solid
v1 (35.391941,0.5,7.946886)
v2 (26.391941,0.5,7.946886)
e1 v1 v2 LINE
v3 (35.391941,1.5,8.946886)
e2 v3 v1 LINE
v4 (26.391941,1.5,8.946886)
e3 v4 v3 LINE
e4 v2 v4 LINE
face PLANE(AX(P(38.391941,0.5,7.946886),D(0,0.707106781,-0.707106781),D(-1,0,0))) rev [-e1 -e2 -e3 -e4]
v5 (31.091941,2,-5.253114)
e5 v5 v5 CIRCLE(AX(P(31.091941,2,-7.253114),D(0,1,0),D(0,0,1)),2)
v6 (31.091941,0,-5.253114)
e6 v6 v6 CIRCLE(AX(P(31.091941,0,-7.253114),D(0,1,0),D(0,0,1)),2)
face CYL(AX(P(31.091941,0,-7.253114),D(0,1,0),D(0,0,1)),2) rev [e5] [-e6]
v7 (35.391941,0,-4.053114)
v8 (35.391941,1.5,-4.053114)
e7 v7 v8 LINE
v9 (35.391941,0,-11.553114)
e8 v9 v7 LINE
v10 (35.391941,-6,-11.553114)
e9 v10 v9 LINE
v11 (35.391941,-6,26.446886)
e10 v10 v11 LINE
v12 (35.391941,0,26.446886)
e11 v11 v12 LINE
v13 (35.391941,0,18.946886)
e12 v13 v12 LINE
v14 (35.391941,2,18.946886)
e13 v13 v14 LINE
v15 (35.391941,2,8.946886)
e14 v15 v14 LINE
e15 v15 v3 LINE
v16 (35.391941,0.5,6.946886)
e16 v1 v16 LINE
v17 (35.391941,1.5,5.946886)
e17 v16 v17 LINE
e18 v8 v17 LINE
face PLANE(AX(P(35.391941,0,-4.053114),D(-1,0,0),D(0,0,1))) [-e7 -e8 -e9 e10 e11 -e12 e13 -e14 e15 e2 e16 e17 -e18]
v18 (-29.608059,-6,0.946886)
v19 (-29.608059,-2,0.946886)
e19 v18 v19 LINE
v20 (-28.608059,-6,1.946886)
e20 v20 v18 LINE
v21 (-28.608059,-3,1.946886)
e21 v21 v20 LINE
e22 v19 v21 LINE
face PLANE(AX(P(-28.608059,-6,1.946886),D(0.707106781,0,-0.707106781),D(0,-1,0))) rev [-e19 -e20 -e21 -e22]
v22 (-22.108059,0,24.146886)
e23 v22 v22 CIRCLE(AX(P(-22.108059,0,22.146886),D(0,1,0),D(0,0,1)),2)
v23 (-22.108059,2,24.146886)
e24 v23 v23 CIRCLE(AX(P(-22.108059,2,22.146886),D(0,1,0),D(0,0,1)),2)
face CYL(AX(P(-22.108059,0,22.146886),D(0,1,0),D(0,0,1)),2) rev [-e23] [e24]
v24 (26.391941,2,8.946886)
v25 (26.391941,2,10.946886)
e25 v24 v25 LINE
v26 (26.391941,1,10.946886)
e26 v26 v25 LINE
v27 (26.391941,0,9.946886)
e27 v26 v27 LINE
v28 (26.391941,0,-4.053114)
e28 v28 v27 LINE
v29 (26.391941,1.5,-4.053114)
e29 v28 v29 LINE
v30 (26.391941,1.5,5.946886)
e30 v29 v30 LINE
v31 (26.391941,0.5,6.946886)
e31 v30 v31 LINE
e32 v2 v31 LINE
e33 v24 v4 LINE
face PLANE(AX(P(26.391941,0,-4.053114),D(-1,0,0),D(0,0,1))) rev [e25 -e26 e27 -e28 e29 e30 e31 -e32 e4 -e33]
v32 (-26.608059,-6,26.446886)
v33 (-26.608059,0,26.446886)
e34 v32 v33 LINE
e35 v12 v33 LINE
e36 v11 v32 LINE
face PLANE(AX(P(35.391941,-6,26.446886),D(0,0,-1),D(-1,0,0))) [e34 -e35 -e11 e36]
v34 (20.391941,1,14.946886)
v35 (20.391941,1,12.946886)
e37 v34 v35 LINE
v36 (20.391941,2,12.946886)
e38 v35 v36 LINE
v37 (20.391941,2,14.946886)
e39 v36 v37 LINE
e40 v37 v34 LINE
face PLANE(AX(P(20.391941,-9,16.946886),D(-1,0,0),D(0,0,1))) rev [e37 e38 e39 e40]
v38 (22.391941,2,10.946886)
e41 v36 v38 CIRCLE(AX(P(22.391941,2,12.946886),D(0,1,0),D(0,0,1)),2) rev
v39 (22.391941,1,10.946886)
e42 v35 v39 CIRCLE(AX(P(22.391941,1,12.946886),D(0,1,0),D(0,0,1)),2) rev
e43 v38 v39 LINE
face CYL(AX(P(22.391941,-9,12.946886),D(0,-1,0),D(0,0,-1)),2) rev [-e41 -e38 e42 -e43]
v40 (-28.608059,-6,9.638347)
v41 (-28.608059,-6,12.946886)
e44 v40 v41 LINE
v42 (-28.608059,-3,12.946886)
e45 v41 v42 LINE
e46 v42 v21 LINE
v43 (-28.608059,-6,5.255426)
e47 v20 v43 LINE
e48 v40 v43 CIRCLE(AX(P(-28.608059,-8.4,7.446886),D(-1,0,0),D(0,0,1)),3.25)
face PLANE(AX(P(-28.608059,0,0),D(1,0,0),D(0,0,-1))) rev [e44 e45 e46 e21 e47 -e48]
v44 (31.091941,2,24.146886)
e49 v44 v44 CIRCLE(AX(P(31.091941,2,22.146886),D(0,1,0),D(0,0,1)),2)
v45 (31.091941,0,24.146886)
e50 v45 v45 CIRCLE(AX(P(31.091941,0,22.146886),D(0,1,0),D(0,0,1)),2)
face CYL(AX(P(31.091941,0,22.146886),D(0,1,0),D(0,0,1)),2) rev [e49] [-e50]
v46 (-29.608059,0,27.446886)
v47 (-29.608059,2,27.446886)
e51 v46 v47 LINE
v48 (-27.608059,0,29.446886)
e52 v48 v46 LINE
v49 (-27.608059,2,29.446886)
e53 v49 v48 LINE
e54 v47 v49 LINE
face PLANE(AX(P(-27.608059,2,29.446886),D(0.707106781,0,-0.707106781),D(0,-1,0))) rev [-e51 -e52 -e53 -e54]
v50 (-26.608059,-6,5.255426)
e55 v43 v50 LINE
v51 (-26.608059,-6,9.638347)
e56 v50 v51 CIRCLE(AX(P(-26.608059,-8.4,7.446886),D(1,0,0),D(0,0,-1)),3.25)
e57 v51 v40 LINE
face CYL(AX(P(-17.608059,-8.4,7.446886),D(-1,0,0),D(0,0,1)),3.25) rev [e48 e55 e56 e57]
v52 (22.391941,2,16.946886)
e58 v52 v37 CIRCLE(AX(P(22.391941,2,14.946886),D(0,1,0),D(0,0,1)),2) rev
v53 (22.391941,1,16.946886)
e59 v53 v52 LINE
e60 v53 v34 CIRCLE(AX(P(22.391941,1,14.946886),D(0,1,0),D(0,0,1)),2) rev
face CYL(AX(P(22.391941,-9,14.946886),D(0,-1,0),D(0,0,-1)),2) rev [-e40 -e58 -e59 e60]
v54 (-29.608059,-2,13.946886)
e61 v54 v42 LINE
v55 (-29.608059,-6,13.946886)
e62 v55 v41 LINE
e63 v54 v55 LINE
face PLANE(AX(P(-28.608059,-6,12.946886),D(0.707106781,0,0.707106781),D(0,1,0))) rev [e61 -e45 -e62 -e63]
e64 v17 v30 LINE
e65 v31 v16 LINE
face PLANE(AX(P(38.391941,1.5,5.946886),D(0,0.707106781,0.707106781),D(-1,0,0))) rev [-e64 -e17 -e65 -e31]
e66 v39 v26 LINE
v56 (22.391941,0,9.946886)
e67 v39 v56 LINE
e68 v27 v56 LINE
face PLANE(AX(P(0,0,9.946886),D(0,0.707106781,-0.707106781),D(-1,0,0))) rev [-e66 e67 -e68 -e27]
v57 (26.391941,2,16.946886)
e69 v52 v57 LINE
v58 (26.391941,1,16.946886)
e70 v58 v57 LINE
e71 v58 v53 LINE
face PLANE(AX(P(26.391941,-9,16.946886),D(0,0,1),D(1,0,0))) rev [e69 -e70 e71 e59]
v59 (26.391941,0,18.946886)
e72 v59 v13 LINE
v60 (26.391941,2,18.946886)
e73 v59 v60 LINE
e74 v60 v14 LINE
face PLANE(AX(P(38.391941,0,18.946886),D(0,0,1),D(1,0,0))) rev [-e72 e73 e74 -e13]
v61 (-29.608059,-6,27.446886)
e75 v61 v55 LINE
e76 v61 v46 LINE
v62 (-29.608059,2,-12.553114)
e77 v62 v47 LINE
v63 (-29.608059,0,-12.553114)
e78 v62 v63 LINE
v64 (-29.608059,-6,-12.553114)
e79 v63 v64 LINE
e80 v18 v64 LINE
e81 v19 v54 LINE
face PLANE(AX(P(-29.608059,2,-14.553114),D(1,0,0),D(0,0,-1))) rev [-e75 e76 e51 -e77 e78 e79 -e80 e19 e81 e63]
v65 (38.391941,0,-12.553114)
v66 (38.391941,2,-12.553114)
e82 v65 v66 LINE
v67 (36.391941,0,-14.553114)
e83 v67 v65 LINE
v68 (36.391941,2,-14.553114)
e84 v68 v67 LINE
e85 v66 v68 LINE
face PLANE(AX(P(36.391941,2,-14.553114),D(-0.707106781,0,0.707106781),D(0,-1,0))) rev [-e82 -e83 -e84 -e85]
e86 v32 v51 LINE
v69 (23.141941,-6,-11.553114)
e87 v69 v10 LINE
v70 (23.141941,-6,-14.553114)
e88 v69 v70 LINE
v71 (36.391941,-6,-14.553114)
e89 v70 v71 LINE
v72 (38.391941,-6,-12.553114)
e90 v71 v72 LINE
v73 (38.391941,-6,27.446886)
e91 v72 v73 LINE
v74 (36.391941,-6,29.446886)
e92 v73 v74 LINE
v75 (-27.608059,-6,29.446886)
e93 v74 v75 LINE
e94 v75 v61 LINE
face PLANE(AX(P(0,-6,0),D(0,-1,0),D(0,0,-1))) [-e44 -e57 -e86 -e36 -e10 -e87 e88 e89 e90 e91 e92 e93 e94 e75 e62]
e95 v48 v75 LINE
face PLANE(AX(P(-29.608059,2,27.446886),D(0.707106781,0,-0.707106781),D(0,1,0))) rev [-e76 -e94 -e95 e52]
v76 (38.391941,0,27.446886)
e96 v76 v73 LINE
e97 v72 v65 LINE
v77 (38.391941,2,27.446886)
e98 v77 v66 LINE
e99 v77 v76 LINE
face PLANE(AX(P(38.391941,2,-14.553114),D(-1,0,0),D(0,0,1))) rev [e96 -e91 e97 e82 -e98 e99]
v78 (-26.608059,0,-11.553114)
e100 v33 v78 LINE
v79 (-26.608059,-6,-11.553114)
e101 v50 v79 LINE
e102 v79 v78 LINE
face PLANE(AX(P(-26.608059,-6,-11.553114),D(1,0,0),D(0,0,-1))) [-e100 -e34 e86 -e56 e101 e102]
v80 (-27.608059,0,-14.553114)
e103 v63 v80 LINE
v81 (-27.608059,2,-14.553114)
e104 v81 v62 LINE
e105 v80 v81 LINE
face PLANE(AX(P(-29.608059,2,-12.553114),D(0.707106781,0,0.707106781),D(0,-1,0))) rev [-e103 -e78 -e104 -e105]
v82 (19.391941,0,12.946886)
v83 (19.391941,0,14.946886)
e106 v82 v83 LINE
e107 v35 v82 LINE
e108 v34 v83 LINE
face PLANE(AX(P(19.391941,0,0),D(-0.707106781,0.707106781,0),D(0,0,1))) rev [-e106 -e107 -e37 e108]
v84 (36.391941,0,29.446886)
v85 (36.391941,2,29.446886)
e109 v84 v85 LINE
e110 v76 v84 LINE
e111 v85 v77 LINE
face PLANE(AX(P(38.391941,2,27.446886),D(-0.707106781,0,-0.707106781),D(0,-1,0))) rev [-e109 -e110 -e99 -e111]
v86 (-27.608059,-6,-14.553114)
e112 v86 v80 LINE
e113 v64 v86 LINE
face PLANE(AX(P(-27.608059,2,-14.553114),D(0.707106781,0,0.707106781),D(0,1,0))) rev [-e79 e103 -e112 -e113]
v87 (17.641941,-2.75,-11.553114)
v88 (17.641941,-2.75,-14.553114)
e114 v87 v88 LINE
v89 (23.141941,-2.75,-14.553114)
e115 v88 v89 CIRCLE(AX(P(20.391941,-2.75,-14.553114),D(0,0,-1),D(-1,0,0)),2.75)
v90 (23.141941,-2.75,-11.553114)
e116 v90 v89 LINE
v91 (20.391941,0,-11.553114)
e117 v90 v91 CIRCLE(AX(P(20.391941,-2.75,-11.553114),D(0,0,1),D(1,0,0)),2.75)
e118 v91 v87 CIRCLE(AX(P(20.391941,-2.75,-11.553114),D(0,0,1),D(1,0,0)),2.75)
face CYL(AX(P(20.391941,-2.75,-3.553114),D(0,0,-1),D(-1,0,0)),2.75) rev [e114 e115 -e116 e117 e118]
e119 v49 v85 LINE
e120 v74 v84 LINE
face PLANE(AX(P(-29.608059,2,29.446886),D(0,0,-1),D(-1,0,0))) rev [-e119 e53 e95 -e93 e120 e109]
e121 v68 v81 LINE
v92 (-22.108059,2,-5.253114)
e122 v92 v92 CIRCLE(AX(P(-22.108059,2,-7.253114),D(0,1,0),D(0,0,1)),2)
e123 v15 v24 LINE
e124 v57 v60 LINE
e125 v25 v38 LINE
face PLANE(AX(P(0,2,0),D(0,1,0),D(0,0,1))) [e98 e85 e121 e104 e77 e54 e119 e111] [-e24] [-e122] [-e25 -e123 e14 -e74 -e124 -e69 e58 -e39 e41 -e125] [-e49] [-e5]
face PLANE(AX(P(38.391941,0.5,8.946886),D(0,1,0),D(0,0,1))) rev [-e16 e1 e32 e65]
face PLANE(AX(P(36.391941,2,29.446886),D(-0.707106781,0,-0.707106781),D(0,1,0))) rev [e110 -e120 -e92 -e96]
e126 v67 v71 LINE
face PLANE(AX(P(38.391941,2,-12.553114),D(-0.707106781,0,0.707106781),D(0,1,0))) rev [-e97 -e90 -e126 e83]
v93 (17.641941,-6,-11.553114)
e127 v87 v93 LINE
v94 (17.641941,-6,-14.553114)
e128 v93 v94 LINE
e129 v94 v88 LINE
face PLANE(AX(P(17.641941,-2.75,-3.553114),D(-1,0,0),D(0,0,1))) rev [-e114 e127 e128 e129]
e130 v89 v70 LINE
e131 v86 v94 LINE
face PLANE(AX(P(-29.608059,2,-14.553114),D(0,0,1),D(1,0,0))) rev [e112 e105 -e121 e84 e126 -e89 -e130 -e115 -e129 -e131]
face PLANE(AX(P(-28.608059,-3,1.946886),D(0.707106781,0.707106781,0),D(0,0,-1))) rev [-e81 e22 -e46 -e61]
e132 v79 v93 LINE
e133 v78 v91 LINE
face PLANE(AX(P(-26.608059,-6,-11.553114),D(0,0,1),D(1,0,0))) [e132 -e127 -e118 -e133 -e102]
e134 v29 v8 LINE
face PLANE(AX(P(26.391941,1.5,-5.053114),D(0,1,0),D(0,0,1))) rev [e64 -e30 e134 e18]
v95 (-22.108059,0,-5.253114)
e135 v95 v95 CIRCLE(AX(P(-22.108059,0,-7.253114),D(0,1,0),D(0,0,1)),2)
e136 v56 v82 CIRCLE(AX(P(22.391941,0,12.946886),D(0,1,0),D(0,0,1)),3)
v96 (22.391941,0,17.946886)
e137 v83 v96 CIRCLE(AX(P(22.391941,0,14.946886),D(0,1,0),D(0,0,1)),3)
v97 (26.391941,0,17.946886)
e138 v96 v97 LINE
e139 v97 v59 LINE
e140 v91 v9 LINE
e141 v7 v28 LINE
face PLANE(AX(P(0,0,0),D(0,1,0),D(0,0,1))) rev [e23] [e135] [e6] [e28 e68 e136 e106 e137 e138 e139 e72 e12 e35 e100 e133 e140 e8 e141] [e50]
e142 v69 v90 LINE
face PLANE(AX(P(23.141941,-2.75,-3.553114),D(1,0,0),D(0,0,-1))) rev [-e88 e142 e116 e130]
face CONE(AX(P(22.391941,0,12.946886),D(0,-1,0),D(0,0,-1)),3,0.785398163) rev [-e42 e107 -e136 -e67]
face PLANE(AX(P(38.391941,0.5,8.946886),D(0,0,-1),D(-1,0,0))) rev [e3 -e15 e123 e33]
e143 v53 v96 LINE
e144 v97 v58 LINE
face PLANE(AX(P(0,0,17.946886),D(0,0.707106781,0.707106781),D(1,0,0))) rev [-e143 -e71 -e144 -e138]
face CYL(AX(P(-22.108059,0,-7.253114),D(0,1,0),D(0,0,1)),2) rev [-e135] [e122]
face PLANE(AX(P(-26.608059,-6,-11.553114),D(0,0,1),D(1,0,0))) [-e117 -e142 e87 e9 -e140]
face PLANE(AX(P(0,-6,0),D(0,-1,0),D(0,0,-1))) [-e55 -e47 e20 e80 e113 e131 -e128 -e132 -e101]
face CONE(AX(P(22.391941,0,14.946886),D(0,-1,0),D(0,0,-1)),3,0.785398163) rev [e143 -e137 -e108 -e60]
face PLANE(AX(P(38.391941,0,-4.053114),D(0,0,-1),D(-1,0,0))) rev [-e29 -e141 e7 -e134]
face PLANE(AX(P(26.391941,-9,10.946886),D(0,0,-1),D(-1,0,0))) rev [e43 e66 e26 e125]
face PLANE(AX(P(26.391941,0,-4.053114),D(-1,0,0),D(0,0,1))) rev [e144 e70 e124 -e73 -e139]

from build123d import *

# Parameters (mm, degrees)
SKETCH1_W            = 68
SKETCH1_H            = 44
BOSS_EXTRUDE1_DEPTH  = 2
SKETCH2_R            = 2
CUT_EXTRUDE1_DEPTH   = 2
SKETCH3_W            = 12
SKETCH3_H            = 23
CUT_EXTRUDE2_DEPTH   = 2
SKETCH4_W            = 3
SKETCH4_H            = 23
BOSS_EXTRUDE2_DEPTH  = 2
SKETCH8_W            = 6
SKETCH8_H            = 12
CUT_EXTRUDE4_DEPTH   = 20
CHAMFER2_SIZE        = 1
CHAMFER4_SIZE        = 2
SKETCH9_W            = 62
SKETCH9_H            = 38
BOSS_EXTRUDE5_DEPTH  = 6
CHAMFER5_SIZE        = 2
SKETCH12_W           = 8.376373975
SKETCH12_H           = 18.223954528
BOSS_EXTRUDE10_DEPTH = 2
SKETCH15_W           = 3
SKETCH15_H           = 1.5
BOSS_EXTRUDE11_DEPTH = 12
CHAMFER7_SIZE        = 1
SKETCH16_W           = 9
SKETCH16_H           = 0.5
BOSS_EXTRUDE12_DEPTH = 11
SKETCH17_W           = 6
SKETCH17_H           = 6
CUT_EXTRUDE5_DEPTH   = 11
FILLET1_R            = 2
SKETCH18_W           = 11
SKETCH18_H           = 3
CUT_EXTRUDE6_DEPTH   = 1
CHAMFER8_SIZE        = 1
SKETCH19_R           = 3.25
CUT_EXTRUDE7_DEPTH   = 11
CUT_EXTRUDE8_DEPTH   = 11
CHAMFER9_SIZE        = 1


with BuildPart() as part:
    # Sketch1 → Boss-Extrude1 (new body)
    with BuildSketch(Plane(origin=(0, 0, 0), x_dir=(1, 0, 0), z_dir=(0, 1, 0))):
        with Locations((4.391941392, -7.446886447)):
            Rectangle(SKETCH1_W, SKETCH1_H)
    extrude(amount=BOSS_EXTRUDE1_DEPTH)

    # Sketch2 → Cut-Extrude1 (cut)
    with BuildSketch(Plane(origin=(0, 2, 0), x_dir=(1, 0, 0), z_dir=(0, 1, 0))):
        with Locations(Location((-22.108058608, 7.253113553, 0), (0, 0, 270))):
            Circle(SKETCH2_R)
        with Locations(Location((31.091941392, 7.253113553, 0), (0, 0, 270))):
            Circle(SKETCH2_R)
        with Locations(Location((31.091941392, -22.146886447, 0), (0, 0, 270))):
            Circle(SKETCH2_R)
        with Locations(Location((-22.108058608, -22.146886447, 0), (0, 0, 270))):
            Circle(SKETCH2_R)
    extrude(amount=-CUT_EXTRUDE1_DEPTH, mode=Mode.SUBTRACT)

    # Sketch3 → Cut-Extrude2 (cut)
    with BuildSketch(Plane(origin=(0, 2, 0), x_dir=(1, 0, 0), z_dir=(0, 1, 0))):
        with Locations((32.391941392, -7.446886447)):
            Rectangle(SKETCH3_W, SKETCH3_H)
    extrude(amount=-CUT_EXTRUDE2_DEPTH, mode=Mode.SUBTRACT)

    # Sketch4 → Boss-Extrude2 (add)
    with BuildSketch(Plane(origin=(0, 2, 0), x_dir=(1, 0, 0), z_dir=(0, 1, 0))):
        with Locations((36.891941392, -7.446886447)):
            Rectangle(SKETCH4_W, SKETCH4_H)
    extrude(amount=-BOSS_EXTRUDE2_DEPTH)

    # Sketch8 → Cut-Extrude4 (cut)
    with BuildSketch(Plane(origin=(0, 2, 0), x_dir=(1, 0, 0), z_dir=(0, 1, 0))):
        with Locations((-26.608058608, -7.446886447)):
            Rectangle(SKETCH8_W, SKETCH8_H)
    extrude(amount=-CUT_EXTRUDE4_DEPTH, mode=Mode.SUBTRACT)

    # Chamfer2
    chamfer2_edges = [part.edges().sort_by_distance(p)[0] for p in [
        (-29.608058608, 1, 13.446886447),
        (-29.608058608, 1, 1.446886447),
    ]]
    chamfer(chamfer2_edges, length=CHAMFER2_SIZE)

    # Chamfer4
    chamfer4_edges = [part.edges().sort_by_distance(p)[0] for p in [
        (-29.608058608, 1, -14.553113553),
        (38.391941392, 1, -14.553113553),
        (38.391941392, 1, 29.446886447),
        (-29.608058608, 1, 29.446886447),
    ]]
    chamfer(chamfer4_edges, length=CHAMFER4_SIZE)

    # Sketch9 → Boss-Extrude5 (add)
    with BuildSketch(Plane.XZ):
        Polygon((-29.608058608, -14.553113553), (38.391941392, -14.553113553), (38.391941392, -11.553113553), (38.391941392, 25.764285426), (38.391941392, 29.446886447), (-29.608058608, 29.446886447), (-29.608058608, 25.764285426), (-29.608058608, -11.553113553), align=None)
        with Locations((4.391941392, 7.446886447)):
            Rectangle(SKETCH9_W, SKETCH9_H, mode=Mode.SUBTRACT)
    extrude(amount=BOSS_EXTRUDE5_DEPTH)

    # Chamfer5
    chamfer5_edges = [part.edges().sort_by_distance(p)[0] for p in [
        (38.391941392, -3, 29.446886447),
        (-29.608058608, -3, 29.446886447),
        (-29.608058608, -3, -14.553113553),
        (38.391941392, -3, -14.553113553),
    ]]
    chamfer(chamfer5_edges, length=CHAMFER5_SIZE - 0.0001)  # a hair under: the kernel refuses the full size

    # Sketch12 → Boss-Extrude10 (add)
    with BuildSketch(Plane(origin=(0, 2, 0), x_dir=(1, 0, 0), z_dir=(0, 1, 0))):
        with Locations((-25.419871621, -7.493021435)):
            Rectangle(SKETCH12_W, SKETCH12_H)
    extrude(amount=-BOSS_EXTRUDE10_DEPTH)

    # Sketch15 → Boss-Extrude11 (add)
    with BuildSketch(Plane(origin=(26.391941392, 0, 0), x_dir=(0, 0, -1), z_dir=(1, 0, 0))):
        with Locations((-7.446886447, 1.25)):
            Rectangle(SKETCH15_W, SKETCH15_H)
    extrude(amount=BOSS_EXTRUDE11_DEPTH)

    # Chamfer7
    chamfer7_edges = [part.edges().sort_by_distance(p)[0] for p in [
        (30.891941392, 0.5, 8.946886447),
        (30.891941392, 0.5, 5.946886447),
    ]]
    chamfer(chamfer7_edges, length=CHAMFER7_SIZE)

    # Sketch16 → Boss-Extrude12 (add)
    with BuildSketch(Plane(origin=(0, 0, 5.946886447), x_dir=(-1, 0, 0), z_dir=(0, 0, -1))):
        with Locations((-30.891941392, 1.75)):
            Rectangle(SKETCH16_W, SKETCH16_H)
    extrude(amount=BOSS_EXTRUDE12_DEPTH)

    # Sketch17 → Cut-Extrude5 (cut)
    with BuildSketch(Plane(origin=(0, 2, 0), x_dir=(1, 0, 0), z_dir=(0, 1, 0))):
        with Locations((23.391941392, -13.946886447)):
            Rectangle(SKETCH17_W, SKETCH17_H)
    extrude(amount=-CUT_EXTRUDE5_DEPTH, mode=Mode.SUBTRACT)

    # Fillet1
    fillet1_edges = [part.edges().sort_by_distance(p)[0] for p in [
        (20.391941392, 1, 16.946886447),
        (20.391941392, 1, 10.946886447),
    ]]
    fillet(fillet1_edges, radius=FILLET1_R)

    # Sketch18 → Cut-Extrude6 (cut)
    with BuildSketch(Plane.ZY.offset(29.608058608)):
        with Locations((7.446886447, -4.5)):
            Rectangle(SKETCH18_W, SKETCH18_H)
    extrude(amount=-CUT_EXTRUDE6_DEPTH, mode=Mode.SUBTRACT)

    # Chamfer8
    chamfer8_edges = [part.edges().sort_by_distance(p)[0] for p in [
        (-29.608058608, -4.5, 12.946886447),
        (-29.608058608, -3, 7.446886447),
        (-29.608058608, -4.5, 1.946886447),
    ]]
    chamfer(chamfer8_edges, length=CHAMFER8_SIZE - 0.0001)  # a hair under: the kernel refuses the full size

    # Sketch19 → Cut-Extrude7 (cut)
    with BuildSketch(Plane.ZY.offset(28.608058608)):
        with Locations((7.446886447, -8.4)):
            Circle(SKETCH19_R)
    extrude(amount=-CUT_EXTRUDE7_DEPTH, mode=Mode.SUBTRACT)

    # Sketch20 → Cut-Extrude8 (cut)
    with BuildSketch(Plane(origin=(0, 0, -14.553113553), x_dir=(-1, 0, 0), z_dir=(0, 0, -1))):
        with BuildLine():
            Line((-23.141941392, -2.75), (-23.141941392, -6))
            Line((-23.141941392, -6), (-17.641941392, -6))
            Line((-17.641941392, -6), (-17.641941392, -2.75))
            ThreePointArc((-17.641941392, -2.75), (-20.391941392, 0), (-23.141941392, -2.75))
        make_face()
    extrude(amount=-CUT_EXTRUDE8_DEPTH, mode=Mode.SUBTRACT)

    # Chamfer9
    chamfer9_edges = [part.edges().sort_by_distance(p)[0] for p in [
        (24.391941392, 0, 10.946886447),
        (20.391941392, 0, 13.946886447),
        (24.391941392, 0, 16.946886447),
        (20.97772783, 0, 11.532672885),
        (20.97772783, 0, 16.361100009),
    ]]
    chamfer(chamfer9_edges, length=CHAMFER9_SIZE)


solid = part.part
